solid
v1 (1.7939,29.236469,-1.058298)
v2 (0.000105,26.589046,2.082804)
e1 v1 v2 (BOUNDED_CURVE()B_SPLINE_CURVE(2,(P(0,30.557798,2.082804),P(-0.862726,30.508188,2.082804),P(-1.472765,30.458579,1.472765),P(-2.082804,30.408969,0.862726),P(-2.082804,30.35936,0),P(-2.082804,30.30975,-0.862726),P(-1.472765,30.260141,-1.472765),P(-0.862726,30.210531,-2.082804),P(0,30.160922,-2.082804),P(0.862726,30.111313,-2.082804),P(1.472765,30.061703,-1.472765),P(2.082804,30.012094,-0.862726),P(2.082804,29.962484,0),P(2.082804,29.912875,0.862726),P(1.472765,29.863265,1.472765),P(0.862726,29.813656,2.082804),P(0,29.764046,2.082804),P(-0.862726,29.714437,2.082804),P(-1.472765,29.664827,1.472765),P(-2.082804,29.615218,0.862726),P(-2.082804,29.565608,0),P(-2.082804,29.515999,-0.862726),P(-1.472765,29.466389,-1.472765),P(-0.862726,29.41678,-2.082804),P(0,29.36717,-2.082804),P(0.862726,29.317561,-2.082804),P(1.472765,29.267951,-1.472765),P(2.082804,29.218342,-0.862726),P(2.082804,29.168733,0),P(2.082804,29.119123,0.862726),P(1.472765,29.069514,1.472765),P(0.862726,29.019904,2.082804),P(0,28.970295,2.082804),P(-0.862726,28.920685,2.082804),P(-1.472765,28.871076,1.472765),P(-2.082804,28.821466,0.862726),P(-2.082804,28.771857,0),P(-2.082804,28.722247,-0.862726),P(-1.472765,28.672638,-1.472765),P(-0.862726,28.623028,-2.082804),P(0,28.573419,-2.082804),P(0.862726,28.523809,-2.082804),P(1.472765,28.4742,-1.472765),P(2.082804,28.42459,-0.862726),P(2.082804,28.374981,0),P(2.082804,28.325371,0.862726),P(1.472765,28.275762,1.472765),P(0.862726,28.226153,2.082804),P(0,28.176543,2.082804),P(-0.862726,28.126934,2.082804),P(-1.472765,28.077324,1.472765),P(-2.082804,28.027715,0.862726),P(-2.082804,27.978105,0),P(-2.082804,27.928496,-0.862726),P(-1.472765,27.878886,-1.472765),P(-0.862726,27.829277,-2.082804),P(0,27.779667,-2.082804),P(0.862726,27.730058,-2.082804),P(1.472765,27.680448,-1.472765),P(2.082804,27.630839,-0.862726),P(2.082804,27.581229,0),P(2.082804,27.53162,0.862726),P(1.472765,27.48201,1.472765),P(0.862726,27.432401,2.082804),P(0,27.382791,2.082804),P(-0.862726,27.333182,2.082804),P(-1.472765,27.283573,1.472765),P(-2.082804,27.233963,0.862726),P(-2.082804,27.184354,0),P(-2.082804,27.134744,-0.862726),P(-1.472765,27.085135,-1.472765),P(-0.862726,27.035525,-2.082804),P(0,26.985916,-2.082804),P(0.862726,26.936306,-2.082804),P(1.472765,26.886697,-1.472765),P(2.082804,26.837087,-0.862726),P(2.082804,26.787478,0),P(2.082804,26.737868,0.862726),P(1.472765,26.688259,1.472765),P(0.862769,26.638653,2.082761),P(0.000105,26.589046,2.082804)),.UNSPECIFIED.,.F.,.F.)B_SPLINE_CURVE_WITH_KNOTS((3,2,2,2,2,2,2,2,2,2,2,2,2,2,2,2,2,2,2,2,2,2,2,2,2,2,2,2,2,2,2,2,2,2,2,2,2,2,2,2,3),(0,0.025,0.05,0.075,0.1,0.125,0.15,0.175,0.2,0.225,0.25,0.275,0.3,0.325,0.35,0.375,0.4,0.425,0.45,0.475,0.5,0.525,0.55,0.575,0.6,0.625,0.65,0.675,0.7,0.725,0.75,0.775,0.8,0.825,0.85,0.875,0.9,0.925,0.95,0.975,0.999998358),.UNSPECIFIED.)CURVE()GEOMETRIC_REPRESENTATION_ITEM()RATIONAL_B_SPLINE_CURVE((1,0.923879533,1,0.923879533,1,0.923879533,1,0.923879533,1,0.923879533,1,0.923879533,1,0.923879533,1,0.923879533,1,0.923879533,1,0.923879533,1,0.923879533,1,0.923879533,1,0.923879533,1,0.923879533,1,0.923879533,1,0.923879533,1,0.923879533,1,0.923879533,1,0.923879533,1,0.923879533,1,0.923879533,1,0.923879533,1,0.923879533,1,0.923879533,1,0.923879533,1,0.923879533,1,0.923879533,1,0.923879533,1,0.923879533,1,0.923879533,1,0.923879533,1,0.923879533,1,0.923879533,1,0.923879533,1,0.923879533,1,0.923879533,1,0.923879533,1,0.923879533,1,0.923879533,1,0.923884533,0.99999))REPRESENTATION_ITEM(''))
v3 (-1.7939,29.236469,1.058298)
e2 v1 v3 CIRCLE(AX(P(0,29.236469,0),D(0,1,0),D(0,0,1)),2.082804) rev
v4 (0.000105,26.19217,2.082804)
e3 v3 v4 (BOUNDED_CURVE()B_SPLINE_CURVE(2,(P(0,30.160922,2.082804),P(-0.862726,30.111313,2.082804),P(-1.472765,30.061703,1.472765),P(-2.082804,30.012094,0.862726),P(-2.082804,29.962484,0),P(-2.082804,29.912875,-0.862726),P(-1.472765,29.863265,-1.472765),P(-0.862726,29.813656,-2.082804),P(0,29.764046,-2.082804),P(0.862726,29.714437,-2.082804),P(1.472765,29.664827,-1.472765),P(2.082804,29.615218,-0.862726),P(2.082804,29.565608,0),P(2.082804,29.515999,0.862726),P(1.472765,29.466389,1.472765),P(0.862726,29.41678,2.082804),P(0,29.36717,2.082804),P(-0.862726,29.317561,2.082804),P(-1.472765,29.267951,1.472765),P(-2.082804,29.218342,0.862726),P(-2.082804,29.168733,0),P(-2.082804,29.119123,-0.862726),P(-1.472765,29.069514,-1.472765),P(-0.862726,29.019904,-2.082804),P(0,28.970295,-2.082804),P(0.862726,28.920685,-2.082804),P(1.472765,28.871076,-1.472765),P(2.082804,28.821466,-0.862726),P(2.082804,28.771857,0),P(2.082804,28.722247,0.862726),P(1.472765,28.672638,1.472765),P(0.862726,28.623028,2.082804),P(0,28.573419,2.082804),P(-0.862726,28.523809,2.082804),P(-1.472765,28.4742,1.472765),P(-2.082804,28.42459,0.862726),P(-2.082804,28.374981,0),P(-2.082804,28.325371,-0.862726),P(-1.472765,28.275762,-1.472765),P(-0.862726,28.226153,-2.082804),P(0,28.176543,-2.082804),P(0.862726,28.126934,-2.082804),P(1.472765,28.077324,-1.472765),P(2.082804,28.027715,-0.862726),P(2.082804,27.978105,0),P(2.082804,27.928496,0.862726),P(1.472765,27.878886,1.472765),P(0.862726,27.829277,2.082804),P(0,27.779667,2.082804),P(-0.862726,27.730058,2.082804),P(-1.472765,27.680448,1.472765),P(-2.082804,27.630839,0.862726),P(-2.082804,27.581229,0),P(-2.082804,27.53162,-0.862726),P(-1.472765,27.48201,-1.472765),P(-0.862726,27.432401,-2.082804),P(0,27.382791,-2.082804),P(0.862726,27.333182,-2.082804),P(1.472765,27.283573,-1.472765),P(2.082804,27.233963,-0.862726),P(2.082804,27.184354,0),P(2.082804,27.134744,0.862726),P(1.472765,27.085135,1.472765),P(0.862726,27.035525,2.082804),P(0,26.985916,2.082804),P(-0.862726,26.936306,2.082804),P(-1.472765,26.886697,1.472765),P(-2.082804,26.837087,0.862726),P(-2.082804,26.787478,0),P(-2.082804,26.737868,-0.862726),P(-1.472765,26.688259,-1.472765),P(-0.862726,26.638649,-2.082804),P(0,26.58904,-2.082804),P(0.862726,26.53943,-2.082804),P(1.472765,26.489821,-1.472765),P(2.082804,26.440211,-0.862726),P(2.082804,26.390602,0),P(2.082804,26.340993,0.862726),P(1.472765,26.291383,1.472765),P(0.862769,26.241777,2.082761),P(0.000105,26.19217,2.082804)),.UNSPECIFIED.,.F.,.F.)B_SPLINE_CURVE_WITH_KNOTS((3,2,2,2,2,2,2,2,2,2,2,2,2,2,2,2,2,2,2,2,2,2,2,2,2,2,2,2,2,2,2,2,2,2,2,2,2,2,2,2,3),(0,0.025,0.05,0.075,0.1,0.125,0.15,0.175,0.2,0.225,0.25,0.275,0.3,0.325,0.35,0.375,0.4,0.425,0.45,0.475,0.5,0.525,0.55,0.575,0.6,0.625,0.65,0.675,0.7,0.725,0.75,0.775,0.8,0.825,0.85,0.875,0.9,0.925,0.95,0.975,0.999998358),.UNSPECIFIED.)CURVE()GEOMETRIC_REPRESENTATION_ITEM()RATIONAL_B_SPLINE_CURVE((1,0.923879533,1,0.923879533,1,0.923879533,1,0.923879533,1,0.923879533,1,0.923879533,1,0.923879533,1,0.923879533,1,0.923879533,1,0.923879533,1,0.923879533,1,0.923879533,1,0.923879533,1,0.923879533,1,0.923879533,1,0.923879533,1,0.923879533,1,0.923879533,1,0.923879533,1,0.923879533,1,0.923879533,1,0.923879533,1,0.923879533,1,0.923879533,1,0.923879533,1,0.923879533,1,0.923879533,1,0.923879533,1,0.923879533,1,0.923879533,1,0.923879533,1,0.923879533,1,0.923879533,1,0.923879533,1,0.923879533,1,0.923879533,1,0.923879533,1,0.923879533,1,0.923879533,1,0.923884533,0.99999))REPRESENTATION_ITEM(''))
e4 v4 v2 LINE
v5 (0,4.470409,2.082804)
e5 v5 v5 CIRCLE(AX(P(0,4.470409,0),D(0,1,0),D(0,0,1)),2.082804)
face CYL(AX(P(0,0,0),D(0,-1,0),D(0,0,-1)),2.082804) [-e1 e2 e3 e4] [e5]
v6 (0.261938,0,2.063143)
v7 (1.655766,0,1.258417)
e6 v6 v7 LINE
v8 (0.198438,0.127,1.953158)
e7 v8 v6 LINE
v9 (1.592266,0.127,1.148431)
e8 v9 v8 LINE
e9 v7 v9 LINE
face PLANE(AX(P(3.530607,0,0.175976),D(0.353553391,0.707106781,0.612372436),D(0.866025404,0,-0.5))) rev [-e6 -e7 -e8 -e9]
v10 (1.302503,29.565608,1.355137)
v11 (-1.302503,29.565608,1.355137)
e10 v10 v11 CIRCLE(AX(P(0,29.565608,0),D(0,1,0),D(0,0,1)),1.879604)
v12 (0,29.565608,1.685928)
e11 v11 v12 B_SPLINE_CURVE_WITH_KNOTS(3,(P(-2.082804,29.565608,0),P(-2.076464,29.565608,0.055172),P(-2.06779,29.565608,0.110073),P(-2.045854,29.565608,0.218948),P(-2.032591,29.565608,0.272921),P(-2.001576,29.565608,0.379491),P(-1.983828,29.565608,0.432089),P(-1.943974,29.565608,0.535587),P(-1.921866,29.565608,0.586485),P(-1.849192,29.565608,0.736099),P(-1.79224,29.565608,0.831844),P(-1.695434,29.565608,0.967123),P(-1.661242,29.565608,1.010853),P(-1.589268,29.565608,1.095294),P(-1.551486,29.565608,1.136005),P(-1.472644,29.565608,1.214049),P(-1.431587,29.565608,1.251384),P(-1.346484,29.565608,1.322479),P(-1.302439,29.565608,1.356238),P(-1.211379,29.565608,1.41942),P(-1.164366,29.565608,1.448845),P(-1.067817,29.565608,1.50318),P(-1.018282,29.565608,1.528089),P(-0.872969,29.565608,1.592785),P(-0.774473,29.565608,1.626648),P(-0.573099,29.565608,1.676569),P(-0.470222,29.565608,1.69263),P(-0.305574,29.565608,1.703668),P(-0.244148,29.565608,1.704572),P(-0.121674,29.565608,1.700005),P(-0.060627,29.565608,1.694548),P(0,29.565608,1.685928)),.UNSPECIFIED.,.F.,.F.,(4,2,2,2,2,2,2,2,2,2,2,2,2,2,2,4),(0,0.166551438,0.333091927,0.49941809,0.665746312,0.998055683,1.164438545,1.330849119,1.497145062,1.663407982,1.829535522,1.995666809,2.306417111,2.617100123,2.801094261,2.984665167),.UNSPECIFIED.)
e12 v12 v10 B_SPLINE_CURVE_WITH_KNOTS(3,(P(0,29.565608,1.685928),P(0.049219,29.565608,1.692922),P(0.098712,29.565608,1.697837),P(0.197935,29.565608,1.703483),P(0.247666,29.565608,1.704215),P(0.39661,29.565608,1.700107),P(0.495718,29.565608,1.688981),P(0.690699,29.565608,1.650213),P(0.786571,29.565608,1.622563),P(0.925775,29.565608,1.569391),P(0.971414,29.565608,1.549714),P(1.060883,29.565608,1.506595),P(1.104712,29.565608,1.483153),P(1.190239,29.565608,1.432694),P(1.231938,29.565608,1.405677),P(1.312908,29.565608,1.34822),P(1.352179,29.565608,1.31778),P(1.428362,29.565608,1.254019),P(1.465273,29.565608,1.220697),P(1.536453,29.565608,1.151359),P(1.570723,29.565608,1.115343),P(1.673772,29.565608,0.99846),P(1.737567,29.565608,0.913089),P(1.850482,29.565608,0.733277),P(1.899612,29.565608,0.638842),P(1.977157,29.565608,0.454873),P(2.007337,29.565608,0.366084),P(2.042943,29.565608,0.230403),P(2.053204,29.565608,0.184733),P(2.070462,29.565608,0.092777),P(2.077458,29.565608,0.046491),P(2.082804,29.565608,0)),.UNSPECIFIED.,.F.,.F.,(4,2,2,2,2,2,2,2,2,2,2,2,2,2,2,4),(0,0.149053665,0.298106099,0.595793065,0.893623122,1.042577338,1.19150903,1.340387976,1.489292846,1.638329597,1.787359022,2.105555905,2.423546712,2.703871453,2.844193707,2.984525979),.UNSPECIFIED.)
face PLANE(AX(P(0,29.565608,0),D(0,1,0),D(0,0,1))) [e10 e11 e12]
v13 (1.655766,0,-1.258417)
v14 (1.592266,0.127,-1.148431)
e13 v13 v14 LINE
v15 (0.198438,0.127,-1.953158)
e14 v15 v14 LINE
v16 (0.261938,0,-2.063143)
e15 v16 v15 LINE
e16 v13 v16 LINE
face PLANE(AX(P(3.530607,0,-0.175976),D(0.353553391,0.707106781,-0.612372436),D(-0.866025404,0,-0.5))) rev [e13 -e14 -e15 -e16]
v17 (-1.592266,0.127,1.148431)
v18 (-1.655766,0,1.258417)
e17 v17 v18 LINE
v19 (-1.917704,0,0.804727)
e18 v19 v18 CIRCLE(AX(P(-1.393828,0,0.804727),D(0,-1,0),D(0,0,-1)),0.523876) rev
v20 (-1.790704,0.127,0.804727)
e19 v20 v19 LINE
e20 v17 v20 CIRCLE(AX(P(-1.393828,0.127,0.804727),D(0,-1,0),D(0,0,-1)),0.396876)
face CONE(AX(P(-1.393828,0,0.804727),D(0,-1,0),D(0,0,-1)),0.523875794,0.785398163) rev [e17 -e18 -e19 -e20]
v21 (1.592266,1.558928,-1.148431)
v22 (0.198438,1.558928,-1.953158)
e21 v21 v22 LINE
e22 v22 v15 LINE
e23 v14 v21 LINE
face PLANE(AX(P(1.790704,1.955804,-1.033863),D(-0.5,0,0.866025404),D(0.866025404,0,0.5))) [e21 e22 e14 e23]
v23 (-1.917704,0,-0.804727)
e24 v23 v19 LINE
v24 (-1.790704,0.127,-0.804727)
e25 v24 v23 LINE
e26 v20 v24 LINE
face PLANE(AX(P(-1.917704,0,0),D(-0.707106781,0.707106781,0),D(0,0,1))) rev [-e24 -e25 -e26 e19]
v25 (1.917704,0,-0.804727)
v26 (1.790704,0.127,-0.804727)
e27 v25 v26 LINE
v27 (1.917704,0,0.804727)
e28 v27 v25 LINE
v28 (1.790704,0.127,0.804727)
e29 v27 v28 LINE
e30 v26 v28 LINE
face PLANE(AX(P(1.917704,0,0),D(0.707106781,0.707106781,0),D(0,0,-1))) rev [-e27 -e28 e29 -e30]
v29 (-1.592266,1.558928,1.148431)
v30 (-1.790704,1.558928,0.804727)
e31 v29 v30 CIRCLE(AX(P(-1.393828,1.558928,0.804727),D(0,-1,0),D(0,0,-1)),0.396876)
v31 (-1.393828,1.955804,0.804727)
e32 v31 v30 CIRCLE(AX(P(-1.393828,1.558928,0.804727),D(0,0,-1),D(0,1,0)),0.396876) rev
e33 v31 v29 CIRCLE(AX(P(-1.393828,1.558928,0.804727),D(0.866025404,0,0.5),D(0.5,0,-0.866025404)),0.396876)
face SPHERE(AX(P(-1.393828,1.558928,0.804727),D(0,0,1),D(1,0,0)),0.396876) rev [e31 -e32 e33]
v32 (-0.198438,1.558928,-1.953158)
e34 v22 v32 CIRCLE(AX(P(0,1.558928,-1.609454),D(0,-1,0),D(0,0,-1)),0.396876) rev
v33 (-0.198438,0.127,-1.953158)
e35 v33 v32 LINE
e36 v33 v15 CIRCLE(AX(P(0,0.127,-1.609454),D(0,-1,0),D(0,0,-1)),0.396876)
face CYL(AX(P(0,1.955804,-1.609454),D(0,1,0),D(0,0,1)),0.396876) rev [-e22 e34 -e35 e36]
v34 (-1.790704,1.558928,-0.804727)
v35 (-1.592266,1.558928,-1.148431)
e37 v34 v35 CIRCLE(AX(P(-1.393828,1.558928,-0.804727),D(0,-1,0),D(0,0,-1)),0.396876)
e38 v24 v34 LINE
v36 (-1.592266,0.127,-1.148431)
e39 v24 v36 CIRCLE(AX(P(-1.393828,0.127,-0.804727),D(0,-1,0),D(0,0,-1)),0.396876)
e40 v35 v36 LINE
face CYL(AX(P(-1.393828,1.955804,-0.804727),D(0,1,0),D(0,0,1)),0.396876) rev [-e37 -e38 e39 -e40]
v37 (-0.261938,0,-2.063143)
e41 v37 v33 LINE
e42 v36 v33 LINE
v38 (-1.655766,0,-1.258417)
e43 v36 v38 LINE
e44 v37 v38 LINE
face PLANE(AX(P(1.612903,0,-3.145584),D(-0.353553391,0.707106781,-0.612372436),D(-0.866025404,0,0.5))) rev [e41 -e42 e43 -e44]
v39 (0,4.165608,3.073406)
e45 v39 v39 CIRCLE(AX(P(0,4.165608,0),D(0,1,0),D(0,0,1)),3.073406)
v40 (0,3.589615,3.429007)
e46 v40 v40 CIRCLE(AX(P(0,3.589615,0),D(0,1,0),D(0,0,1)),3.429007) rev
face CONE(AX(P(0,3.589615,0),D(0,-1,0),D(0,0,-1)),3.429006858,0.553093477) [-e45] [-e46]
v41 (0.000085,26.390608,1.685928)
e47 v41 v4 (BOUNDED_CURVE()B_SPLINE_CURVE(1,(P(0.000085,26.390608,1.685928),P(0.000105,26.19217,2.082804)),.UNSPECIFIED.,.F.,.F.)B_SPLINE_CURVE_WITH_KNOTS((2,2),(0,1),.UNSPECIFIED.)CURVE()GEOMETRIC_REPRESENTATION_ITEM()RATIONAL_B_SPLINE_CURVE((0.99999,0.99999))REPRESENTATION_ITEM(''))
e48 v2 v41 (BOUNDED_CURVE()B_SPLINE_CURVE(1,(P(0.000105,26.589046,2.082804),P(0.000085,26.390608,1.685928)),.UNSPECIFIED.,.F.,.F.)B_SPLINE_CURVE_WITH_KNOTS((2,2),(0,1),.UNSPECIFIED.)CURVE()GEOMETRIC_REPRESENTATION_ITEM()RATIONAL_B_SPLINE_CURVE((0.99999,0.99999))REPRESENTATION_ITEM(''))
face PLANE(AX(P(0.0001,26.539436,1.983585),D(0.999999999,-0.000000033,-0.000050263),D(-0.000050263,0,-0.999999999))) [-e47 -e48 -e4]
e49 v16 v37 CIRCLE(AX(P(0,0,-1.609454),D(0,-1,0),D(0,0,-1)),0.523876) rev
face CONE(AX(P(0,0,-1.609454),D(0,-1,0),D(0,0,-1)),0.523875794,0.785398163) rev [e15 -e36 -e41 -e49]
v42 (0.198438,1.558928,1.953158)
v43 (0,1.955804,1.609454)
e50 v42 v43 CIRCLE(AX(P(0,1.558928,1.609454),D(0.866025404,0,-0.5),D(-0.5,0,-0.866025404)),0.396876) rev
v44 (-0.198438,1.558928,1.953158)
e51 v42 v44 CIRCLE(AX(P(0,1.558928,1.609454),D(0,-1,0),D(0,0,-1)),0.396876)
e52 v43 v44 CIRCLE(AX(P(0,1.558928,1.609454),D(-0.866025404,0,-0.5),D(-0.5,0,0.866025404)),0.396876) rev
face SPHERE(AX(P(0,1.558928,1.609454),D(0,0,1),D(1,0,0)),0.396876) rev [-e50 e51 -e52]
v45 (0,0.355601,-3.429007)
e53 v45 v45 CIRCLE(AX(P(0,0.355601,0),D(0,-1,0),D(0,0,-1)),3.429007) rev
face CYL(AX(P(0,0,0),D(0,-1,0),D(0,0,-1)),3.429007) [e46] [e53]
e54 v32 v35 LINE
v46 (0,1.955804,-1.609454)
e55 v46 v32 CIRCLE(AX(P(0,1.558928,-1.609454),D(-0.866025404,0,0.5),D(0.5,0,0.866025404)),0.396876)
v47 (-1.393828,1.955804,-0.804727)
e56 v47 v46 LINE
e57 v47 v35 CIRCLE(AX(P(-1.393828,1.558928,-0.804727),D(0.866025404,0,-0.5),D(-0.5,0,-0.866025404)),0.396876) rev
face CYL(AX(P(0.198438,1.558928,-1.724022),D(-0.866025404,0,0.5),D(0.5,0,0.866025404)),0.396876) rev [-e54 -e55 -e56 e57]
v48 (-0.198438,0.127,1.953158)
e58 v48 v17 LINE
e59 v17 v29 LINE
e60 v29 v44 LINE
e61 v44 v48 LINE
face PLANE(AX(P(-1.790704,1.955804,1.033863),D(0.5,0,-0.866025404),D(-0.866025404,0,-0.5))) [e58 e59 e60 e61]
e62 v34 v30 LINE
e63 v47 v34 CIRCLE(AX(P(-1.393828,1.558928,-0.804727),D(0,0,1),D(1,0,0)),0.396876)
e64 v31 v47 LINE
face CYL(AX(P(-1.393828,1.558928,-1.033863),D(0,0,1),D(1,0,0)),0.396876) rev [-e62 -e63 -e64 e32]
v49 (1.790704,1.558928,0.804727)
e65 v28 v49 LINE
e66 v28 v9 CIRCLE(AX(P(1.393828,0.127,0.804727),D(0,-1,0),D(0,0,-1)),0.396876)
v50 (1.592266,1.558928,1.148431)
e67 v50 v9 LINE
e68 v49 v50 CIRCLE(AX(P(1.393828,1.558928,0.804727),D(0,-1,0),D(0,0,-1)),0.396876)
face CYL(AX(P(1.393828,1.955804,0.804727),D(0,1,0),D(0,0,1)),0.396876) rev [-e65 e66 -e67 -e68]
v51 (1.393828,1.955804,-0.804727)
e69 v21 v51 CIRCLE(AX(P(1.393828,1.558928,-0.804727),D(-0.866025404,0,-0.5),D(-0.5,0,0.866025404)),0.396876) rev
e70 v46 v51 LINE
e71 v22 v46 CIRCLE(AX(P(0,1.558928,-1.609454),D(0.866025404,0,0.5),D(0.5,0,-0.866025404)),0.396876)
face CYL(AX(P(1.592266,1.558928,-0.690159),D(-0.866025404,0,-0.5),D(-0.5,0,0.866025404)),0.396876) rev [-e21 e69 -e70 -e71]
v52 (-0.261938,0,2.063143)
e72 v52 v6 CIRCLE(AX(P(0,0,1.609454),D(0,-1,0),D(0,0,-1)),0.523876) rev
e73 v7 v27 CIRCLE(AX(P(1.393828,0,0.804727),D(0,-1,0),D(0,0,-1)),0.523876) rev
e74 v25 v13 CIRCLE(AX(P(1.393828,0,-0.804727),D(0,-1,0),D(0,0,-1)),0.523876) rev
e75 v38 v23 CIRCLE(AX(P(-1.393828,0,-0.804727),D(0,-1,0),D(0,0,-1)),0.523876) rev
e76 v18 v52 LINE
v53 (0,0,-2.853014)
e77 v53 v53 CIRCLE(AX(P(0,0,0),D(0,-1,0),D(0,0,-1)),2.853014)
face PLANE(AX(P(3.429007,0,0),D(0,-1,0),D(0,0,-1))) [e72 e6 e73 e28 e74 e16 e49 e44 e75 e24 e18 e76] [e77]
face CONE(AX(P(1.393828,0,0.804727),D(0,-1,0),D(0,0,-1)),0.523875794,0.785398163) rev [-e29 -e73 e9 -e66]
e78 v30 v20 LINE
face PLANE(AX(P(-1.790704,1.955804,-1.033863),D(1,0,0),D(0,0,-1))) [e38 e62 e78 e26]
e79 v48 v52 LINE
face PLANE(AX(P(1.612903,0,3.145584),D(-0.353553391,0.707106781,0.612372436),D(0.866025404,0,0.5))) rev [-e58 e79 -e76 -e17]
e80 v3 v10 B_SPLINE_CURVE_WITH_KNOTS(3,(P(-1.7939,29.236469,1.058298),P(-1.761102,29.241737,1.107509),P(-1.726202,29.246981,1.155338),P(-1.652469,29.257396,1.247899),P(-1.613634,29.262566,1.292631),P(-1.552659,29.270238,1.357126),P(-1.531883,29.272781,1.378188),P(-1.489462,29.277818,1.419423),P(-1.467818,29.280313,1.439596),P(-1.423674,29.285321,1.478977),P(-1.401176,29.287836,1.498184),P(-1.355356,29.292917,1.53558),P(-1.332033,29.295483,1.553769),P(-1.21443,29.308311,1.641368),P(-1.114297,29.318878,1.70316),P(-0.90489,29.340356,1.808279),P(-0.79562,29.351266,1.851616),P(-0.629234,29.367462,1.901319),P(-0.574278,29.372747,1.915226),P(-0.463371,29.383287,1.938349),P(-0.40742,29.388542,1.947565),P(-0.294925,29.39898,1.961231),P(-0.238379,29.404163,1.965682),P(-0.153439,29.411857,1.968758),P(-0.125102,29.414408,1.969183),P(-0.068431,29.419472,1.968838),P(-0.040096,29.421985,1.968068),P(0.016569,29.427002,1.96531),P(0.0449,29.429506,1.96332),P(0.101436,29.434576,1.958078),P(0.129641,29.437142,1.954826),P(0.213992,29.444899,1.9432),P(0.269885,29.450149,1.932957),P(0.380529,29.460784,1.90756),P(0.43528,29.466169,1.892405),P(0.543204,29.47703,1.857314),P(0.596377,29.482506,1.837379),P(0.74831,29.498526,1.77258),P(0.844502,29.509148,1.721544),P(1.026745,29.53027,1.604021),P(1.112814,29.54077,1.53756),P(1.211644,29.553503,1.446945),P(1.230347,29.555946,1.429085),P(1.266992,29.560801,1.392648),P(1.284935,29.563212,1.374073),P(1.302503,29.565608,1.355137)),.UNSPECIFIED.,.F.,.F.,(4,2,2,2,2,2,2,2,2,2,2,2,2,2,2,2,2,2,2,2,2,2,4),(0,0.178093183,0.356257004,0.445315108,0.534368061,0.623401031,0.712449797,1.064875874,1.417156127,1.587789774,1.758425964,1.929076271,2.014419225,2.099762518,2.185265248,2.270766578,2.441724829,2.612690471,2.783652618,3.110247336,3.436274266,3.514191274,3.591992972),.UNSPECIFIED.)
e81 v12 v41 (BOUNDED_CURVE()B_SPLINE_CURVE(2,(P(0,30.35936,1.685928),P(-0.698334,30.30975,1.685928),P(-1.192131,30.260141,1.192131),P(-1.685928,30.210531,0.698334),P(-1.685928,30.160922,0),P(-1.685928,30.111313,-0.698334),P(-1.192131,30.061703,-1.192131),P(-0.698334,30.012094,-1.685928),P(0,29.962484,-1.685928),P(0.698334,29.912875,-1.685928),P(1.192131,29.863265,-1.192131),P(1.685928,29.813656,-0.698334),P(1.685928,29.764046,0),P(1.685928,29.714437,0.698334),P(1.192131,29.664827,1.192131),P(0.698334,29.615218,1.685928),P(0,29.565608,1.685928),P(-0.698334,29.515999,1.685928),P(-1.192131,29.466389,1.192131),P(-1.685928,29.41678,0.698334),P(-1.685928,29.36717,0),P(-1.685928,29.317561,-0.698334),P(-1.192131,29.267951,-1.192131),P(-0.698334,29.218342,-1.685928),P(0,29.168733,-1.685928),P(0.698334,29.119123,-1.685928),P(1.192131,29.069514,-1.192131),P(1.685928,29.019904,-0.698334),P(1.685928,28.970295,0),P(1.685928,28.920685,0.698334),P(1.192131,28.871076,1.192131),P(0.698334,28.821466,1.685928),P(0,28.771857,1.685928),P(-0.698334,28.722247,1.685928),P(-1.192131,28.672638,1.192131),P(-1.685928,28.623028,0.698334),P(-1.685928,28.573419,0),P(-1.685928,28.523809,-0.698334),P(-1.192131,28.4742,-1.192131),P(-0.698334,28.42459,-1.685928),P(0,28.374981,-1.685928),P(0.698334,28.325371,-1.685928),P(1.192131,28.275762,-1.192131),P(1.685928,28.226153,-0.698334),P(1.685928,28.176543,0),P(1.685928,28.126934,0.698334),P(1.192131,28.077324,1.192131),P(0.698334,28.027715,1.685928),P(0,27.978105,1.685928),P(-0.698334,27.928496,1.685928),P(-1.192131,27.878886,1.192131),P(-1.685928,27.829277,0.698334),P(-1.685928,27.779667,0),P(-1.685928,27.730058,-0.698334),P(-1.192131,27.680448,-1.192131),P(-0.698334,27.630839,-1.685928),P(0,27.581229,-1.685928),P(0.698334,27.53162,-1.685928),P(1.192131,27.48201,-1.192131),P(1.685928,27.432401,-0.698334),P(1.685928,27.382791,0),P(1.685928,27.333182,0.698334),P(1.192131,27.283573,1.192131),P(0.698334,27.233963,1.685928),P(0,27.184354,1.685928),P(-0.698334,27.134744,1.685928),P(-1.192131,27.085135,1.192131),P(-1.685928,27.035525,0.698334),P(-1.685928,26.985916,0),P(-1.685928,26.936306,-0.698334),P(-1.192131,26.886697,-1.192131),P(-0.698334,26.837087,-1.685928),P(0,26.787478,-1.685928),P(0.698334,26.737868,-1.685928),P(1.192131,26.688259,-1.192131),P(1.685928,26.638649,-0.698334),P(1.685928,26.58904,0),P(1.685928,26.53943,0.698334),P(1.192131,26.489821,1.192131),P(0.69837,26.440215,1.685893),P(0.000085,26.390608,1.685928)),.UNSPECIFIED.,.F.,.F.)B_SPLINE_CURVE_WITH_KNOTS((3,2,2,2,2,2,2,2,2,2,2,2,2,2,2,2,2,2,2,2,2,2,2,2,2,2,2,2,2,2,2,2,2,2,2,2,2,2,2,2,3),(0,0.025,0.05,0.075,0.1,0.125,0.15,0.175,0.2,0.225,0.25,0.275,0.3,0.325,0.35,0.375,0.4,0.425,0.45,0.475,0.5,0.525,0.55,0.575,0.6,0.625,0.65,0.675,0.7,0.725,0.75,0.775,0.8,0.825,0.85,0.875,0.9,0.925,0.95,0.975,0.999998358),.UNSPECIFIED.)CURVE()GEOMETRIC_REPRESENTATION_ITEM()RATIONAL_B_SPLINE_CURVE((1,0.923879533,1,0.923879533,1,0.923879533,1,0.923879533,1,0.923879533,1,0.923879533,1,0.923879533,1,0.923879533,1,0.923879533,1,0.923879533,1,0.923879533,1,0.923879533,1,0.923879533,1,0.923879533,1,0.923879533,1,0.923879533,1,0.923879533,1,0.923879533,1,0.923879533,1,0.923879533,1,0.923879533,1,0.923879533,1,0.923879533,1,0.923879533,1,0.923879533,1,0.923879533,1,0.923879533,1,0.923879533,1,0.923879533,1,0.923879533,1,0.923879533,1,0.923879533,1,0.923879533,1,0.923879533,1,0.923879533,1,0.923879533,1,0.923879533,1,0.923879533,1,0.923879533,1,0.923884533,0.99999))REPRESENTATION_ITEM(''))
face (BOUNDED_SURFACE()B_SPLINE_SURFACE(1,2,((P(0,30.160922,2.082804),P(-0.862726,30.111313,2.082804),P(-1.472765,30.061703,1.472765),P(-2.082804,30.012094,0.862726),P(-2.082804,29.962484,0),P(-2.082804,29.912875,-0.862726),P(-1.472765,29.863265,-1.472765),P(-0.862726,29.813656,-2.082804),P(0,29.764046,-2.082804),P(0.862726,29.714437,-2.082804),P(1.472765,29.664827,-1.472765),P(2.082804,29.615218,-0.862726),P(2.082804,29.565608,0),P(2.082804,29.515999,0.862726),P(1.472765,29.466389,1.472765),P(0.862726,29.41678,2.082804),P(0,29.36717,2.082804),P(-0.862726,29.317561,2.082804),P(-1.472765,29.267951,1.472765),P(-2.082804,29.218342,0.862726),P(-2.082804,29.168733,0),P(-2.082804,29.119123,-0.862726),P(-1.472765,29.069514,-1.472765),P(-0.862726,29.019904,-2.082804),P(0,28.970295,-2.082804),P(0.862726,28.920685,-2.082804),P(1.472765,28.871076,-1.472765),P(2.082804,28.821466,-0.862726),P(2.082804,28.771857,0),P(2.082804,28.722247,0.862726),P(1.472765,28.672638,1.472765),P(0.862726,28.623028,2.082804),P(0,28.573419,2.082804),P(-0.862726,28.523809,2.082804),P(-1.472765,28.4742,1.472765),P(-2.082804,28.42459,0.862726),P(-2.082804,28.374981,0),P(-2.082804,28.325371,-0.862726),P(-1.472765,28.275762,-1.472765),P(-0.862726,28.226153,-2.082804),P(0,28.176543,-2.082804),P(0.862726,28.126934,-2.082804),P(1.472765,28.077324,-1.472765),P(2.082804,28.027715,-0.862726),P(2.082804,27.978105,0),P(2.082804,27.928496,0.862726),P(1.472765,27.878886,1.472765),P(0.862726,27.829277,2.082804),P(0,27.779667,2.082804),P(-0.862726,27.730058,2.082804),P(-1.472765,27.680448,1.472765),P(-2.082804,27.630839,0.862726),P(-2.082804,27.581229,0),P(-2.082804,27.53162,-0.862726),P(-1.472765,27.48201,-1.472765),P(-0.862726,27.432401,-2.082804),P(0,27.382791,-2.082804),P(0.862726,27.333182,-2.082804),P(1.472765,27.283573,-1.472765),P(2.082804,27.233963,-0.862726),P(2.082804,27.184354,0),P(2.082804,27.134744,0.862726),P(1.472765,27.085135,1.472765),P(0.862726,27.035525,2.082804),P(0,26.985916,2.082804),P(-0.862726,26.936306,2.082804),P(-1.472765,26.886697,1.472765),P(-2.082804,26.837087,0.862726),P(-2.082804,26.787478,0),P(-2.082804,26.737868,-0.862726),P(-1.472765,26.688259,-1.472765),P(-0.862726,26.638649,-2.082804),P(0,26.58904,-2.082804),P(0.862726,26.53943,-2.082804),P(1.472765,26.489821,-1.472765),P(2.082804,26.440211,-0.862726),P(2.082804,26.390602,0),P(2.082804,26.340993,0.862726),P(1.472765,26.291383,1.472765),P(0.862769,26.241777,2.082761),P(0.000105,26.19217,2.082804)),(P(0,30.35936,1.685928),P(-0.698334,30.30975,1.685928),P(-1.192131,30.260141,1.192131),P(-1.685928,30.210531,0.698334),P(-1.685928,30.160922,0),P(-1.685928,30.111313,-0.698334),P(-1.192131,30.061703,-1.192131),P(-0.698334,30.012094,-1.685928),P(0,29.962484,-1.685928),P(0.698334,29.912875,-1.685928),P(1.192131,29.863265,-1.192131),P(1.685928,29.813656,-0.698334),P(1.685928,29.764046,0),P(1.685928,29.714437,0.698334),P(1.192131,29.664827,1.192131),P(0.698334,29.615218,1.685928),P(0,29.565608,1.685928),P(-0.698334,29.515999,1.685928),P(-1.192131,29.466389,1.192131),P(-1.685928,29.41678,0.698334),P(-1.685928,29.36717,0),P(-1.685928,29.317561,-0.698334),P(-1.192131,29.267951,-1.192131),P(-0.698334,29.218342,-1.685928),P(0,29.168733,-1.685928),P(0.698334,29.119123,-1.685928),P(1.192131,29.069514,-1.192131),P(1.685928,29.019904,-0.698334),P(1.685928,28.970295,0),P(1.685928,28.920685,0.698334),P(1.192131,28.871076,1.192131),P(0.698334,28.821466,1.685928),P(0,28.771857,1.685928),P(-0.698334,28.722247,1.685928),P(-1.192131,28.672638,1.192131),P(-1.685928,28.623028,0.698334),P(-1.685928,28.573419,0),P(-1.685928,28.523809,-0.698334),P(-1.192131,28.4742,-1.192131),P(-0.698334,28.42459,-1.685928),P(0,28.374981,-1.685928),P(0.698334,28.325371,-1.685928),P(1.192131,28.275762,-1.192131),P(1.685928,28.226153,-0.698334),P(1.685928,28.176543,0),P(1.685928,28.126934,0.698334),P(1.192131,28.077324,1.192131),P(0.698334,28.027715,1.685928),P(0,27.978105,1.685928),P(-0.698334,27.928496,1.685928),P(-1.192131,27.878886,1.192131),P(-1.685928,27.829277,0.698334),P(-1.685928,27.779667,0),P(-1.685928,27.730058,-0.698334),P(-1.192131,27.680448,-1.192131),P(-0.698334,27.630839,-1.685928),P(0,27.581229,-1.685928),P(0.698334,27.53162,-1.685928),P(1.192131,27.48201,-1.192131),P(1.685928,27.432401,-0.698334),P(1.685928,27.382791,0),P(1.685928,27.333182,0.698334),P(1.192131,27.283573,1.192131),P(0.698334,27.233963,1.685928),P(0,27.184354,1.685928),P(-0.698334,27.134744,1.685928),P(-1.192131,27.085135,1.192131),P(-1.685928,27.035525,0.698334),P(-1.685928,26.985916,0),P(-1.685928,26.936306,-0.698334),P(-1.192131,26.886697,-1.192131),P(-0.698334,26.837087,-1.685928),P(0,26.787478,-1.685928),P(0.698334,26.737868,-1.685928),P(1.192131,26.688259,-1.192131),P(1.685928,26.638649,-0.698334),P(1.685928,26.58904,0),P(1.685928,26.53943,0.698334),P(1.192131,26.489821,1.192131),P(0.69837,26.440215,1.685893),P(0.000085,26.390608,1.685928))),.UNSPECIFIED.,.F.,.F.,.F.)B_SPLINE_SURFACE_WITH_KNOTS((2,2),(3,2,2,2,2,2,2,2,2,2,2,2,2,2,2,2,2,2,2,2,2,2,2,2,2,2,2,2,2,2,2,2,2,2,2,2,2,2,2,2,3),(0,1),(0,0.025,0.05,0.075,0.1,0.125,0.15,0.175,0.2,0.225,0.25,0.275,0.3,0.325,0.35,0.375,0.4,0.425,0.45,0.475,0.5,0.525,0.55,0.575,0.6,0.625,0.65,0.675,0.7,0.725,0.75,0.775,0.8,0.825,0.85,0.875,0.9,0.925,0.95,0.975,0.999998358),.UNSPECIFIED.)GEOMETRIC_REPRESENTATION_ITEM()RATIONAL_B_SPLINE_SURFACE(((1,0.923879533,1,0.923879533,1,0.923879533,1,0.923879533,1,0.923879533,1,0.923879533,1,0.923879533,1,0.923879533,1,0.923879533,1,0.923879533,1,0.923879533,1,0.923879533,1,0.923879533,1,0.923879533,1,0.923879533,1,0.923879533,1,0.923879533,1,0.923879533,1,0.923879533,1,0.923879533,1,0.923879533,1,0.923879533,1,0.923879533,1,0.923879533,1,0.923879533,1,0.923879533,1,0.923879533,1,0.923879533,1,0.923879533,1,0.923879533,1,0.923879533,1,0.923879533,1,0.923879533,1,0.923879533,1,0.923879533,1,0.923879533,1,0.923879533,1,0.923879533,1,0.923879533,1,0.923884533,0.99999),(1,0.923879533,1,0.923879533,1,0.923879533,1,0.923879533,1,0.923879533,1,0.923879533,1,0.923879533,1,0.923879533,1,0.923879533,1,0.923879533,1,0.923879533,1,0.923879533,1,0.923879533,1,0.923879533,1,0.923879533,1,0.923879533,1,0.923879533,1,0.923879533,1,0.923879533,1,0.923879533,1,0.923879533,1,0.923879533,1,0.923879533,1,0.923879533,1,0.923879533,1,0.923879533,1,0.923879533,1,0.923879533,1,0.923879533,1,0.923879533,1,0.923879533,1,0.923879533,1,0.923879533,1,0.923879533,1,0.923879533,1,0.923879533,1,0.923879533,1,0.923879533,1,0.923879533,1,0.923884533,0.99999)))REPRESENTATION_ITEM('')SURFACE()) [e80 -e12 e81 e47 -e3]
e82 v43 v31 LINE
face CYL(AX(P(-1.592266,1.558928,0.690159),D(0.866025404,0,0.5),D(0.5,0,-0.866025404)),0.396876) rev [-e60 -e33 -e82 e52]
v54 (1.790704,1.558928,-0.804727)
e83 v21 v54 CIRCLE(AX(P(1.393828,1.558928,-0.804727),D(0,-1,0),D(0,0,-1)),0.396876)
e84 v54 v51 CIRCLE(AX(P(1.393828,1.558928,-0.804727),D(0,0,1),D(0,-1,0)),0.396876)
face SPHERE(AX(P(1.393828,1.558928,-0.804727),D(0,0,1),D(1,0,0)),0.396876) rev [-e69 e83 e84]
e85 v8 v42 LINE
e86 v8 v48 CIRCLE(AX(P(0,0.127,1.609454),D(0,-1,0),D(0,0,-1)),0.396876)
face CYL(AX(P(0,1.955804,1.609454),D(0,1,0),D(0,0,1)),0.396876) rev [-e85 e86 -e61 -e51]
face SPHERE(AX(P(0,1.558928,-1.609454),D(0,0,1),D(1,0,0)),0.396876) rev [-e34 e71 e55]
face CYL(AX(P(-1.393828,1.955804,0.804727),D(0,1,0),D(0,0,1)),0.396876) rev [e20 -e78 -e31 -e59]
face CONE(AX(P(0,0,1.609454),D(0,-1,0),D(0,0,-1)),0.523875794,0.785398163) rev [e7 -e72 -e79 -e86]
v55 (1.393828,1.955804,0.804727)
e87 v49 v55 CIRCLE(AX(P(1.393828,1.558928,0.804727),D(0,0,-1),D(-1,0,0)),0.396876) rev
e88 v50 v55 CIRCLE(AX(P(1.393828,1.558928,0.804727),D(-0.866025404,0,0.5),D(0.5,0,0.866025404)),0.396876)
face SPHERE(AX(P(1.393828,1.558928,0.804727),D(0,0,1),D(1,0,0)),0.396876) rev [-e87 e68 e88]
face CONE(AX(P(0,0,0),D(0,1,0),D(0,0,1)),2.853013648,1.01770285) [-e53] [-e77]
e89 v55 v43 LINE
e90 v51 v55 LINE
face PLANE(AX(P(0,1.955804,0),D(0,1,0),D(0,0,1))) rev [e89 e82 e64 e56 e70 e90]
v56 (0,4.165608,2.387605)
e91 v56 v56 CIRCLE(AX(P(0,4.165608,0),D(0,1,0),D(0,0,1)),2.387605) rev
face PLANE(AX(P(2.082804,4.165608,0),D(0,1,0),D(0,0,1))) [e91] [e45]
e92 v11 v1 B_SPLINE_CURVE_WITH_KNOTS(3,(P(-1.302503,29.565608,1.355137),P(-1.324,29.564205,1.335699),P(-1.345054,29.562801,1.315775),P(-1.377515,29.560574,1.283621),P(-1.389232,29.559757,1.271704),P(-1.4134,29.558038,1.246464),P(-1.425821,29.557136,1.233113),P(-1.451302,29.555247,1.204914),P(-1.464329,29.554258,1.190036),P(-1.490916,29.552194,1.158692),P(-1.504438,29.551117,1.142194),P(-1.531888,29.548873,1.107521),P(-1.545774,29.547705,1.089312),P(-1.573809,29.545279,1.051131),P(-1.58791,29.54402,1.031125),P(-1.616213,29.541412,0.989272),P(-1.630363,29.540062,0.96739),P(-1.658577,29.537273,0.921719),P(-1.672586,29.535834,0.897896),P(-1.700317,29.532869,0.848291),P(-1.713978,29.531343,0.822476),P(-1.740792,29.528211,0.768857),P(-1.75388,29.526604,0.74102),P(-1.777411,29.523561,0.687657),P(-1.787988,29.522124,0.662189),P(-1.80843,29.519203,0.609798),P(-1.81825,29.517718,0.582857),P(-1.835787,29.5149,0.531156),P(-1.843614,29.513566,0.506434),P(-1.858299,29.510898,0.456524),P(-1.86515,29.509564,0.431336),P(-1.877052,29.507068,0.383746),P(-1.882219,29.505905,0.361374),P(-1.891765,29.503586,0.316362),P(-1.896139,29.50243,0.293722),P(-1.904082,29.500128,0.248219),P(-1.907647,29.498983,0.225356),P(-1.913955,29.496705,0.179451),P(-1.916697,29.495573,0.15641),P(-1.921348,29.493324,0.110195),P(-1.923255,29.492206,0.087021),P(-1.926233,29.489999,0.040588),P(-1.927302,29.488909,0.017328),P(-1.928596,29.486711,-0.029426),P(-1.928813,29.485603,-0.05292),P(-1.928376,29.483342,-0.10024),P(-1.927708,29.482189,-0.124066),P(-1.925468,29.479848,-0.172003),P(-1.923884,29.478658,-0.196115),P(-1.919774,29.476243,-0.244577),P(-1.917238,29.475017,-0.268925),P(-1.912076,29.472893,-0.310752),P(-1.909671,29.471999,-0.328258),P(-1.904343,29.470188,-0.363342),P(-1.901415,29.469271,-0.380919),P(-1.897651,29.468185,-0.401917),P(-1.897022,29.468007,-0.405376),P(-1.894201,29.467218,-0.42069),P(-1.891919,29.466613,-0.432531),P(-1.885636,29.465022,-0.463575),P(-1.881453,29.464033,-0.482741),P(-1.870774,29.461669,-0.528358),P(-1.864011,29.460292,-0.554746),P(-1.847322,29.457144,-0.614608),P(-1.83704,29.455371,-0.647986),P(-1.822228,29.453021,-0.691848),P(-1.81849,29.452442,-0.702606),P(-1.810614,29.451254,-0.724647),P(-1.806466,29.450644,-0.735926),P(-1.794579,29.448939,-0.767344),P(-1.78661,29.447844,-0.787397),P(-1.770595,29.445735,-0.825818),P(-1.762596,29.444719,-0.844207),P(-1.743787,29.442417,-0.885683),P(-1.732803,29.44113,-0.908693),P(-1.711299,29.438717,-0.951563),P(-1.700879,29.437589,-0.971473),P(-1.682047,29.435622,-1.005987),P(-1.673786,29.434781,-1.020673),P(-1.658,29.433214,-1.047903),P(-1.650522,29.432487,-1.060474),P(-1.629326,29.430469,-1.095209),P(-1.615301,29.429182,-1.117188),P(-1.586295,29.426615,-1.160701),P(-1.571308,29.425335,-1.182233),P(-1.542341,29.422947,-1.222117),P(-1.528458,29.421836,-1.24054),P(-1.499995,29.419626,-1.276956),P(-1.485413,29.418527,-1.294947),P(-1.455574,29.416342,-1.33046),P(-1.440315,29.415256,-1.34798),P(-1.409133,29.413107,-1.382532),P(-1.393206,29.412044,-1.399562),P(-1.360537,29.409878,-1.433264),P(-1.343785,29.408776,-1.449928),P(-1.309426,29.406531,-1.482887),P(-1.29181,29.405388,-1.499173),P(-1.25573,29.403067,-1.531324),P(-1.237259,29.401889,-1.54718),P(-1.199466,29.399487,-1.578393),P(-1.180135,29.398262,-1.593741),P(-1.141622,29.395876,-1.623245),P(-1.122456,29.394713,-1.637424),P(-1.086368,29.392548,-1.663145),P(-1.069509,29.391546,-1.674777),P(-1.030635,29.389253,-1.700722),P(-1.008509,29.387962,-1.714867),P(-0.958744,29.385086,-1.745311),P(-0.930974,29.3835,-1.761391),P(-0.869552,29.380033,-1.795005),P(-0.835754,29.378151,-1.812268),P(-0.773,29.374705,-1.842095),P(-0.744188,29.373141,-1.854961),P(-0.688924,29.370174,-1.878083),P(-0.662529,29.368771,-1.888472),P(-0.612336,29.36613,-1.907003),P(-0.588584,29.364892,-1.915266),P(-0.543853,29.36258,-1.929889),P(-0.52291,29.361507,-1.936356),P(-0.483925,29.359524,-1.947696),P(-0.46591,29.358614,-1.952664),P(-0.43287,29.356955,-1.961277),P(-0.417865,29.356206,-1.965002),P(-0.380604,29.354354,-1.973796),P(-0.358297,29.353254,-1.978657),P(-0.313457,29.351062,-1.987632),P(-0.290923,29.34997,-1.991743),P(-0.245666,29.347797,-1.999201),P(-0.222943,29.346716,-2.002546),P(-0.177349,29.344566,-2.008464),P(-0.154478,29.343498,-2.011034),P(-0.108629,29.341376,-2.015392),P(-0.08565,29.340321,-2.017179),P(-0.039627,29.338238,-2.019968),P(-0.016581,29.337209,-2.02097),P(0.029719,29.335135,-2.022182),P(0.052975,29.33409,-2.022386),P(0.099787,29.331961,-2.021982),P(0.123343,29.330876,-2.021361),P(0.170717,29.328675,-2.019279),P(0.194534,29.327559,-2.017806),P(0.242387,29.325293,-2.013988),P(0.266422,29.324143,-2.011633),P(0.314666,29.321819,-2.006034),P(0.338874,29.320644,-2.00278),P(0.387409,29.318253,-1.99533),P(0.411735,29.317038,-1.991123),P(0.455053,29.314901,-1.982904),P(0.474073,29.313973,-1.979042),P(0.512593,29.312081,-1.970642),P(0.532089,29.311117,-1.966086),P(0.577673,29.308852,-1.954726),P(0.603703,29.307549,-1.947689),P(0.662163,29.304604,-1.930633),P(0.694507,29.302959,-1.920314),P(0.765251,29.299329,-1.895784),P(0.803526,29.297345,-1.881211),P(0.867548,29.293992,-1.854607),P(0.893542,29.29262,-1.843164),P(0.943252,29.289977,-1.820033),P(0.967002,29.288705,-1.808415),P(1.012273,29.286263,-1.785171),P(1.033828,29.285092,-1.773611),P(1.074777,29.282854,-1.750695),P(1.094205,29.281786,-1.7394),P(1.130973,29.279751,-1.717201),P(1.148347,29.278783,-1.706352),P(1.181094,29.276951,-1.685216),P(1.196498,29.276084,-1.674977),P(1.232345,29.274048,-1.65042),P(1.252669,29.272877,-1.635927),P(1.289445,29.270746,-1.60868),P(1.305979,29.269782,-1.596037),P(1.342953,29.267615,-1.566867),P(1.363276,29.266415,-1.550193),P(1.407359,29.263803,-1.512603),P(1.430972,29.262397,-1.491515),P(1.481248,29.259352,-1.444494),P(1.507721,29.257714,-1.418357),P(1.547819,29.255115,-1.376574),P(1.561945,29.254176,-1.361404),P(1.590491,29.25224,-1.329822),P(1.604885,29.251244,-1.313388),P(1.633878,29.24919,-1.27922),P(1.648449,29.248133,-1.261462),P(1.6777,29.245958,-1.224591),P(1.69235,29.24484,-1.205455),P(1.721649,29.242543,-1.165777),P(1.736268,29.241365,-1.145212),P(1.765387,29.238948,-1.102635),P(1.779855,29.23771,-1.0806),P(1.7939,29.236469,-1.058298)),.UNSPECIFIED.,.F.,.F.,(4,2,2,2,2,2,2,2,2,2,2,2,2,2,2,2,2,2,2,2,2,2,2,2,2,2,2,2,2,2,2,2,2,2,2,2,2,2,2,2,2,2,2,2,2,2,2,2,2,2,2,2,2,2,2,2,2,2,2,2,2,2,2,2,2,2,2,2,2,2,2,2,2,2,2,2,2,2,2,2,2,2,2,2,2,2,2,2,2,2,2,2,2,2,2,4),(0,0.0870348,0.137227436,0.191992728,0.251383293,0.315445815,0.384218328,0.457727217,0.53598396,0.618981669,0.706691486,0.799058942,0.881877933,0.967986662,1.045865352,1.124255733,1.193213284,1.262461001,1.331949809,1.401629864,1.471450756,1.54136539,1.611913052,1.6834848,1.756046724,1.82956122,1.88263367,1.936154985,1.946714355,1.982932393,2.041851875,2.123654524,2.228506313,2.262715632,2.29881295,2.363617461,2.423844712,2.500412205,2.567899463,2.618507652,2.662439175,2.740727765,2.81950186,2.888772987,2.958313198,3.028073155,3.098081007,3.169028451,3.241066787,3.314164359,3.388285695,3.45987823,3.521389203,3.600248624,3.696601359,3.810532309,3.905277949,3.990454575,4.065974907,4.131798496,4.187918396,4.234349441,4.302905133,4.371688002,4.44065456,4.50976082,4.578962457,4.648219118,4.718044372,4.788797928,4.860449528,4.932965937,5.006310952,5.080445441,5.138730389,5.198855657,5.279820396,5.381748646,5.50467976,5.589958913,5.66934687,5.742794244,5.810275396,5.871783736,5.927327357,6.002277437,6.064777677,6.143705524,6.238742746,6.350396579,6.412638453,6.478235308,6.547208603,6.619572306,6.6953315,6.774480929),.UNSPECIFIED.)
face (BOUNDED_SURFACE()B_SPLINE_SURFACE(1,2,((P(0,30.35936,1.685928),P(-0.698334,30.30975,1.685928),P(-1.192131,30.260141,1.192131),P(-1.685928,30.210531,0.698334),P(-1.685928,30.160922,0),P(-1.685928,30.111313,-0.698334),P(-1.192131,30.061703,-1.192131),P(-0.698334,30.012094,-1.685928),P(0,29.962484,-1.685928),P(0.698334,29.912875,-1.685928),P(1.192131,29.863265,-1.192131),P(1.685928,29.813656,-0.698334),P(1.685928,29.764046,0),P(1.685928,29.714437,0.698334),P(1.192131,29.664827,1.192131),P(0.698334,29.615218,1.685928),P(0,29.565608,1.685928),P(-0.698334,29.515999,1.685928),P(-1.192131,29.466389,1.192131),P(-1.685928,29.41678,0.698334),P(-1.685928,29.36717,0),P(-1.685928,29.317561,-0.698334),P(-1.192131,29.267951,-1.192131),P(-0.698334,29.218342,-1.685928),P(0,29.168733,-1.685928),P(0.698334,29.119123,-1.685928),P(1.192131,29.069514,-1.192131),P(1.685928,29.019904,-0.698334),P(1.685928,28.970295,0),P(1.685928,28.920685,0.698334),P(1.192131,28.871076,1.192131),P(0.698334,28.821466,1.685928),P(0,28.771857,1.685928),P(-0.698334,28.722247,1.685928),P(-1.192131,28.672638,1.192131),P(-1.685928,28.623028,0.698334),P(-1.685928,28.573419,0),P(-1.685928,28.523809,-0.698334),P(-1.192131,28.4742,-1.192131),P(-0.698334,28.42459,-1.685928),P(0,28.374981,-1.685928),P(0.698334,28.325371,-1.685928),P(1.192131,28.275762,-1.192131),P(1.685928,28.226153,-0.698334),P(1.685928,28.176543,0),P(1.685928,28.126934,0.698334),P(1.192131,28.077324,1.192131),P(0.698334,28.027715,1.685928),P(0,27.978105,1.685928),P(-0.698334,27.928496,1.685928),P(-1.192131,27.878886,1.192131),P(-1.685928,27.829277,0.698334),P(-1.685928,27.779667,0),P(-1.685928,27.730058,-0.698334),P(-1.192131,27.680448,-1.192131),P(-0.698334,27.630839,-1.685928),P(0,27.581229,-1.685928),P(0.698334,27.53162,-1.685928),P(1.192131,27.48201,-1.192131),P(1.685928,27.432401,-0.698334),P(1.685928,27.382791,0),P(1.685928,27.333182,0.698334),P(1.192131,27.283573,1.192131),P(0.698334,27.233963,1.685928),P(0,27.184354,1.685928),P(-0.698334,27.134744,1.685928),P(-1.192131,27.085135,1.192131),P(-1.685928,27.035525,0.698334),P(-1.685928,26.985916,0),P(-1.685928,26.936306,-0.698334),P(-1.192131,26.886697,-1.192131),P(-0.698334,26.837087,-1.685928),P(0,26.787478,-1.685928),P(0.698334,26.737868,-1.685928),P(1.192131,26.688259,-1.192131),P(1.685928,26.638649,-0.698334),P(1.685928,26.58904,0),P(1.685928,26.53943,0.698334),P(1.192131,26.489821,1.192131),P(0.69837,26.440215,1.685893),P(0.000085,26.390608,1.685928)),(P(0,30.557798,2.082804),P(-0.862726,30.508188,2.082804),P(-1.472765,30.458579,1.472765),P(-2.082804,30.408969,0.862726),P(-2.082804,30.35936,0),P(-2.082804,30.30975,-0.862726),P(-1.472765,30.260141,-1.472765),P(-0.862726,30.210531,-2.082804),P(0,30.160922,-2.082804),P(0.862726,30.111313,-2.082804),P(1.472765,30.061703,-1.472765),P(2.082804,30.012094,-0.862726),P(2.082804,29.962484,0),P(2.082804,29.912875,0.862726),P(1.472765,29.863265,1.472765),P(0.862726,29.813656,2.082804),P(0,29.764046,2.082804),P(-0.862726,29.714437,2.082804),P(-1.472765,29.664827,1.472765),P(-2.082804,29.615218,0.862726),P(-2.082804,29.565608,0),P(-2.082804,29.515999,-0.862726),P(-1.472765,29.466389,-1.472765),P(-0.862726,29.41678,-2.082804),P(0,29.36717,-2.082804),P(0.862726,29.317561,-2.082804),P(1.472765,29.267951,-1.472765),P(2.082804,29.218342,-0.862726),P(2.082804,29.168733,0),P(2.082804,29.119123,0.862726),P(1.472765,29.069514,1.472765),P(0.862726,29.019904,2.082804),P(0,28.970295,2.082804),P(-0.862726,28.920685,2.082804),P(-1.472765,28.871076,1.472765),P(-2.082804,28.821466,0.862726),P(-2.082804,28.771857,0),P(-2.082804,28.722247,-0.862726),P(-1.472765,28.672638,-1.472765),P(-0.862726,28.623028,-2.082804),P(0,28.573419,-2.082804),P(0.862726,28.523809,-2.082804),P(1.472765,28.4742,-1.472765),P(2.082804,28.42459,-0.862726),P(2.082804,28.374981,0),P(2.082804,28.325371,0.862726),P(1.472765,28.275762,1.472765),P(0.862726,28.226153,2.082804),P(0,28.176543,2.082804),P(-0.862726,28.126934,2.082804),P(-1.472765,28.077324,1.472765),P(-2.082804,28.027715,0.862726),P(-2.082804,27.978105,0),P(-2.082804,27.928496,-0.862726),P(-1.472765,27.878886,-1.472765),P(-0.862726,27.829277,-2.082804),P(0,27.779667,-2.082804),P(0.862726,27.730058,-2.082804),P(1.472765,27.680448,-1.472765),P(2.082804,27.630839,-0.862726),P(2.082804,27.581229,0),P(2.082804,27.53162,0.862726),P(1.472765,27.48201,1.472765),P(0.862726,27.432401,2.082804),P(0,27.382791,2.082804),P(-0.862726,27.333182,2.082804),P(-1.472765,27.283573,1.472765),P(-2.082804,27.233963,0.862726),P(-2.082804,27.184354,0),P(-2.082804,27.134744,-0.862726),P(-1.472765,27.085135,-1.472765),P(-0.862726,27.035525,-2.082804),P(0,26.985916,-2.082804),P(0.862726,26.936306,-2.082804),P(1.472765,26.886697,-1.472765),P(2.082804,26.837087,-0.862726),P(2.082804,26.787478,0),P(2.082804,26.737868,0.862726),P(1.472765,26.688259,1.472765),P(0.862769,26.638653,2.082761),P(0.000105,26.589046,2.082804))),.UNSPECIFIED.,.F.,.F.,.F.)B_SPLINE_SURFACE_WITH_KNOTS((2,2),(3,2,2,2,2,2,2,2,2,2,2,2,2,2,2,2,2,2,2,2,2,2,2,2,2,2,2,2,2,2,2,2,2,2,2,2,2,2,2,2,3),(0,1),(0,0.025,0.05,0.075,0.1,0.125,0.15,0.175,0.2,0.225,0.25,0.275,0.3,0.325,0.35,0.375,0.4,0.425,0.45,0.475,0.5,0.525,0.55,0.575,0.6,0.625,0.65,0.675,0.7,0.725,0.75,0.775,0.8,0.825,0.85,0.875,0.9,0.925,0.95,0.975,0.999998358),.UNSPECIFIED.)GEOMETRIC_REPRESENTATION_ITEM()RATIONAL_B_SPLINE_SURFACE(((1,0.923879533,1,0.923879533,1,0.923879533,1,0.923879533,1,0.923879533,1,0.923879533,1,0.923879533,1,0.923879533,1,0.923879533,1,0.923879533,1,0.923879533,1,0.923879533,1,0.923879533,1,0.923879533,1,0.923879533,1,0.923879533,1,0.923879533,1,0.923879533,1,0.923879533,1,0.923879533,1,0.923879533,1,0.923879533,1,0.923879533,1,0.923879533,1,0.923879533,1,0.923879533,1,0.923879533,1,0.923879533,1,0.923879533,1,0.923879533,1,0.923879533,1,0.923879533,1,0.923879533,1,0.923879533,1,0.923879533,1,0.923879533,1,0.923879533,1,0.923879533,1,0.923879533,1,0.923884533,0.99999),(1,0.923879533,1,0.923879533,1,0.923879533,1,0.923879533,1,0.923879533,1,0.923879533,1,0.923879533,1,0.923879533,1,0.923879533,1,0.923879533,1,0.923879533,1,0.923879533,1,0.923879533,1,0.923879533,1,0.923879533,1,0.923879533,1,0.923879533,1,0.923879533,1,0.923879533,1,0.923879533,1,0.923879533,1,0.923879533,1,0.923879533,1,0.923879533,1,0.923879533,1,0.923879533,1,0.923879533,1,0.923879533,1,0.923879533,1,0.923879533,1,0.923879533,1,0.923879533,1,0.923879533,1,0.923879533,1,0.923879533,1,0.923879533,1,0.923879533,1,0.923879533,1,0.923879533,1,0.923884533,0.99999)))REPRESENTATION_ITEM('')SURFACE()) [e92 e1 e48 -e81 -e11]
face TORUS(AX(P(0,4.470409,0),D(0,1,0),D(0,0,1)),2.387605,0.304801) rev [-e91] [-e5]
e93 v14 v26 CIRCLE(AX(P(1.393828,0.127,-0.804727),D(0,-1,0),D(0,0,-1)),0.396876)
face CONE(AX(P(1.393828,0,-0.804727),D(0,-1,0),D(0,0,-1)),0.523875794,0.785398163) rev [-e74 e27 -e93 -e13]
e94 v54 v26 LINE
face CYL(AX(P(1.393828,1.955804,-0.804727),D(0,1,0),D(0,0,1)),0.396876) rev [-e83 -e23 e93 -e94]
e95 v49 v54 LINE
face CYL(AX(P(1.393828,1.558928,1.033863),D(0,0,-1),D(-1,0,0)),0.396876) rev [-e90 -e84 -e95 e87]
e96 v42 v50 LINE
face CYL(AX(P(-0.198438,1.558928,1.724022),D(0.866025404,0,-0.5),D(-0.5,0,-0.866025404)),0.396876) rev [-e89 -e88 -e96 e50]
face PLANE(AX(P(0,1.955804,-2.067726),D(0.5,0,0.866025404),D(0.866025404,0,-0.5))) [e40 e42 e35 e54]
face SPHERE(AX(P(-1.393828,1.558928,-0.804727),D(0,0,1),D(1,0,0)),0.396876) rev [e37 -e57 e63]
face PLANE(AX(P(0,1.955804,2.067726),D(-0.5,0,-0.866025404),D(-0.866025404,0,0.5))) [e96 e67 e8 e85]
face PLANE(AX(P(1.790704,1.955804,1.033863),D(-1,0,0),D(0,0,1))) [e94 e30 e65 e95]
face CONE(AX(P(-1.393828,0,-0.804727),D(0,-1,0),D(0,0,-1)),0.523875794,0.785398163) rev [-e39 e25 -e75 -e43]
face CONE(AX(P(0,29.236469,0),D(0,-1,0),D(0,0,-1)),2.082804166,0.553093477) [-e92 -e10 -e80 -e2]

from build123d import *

# Parameters (mm, degrees)
CUT_SWEEP1_PITCH   = 0.793751588
CUT_EXTRUDE1_DEPTH = 1.955803912
FILLET1_R          = 0.30480061
FILLET2_R          = 0.396875794
CHAMFER3_SIZE      = 0.127


with BuildPart() as part:
    # Sketch1 → Revolve1 (revolve)
    with BuildSketch(Plane.XY, mode=Mode.PRIVATE) as revolve1_sk:
        Polygon((0, 0), (0, 29.565608331), (2.082804166, 29.565608331), (2.082804166, 4.165608331), (3.429006858, 4.165608331), (3.429006858, 0), align=None)
    revolve(revolve1_sk.sketch.rotate(Axis((0, 0, 0), (0, 1, 0)), 90), axis=Axis((0, 0, 0), (0, 1, 0)))

    # Cut-Sweep1: arcs per turn and ends read off the stored shape
    # Cut-Sweep1: the profile of Sketch3 profile screwed along a right-hand helix through 4.999992 turns, 8 arcs to a turn; built about Z, then put on its axis
    cut_sweep1_z = Axis((0, 0, 0), (0, 0, 1))
    cut_sweep1_corners = [(2.083104166, 0, -0.595163691), (2.083104166, 0, -0.992339484), (1.685928372, 0, -0.793751588)]
    with BuildLine(mode=Mode.PRIVATE) as cut_sweep1_profile:
        Line(cut_sweep1_corners[0], cut_sweep1_corners[1])
        Line(cut_sweep1_corners[1], cut_sweep1_corners[2])
        Line(cut_sweep1_corners[2], cut_sweep1_corners[0])
    cut_sweep1_cap = Face(cut_sweep1_profile.wire())
    cut_sweep1_turn_angles = [0, 22.5, 45, 67.5, 90, 112.5, 135, 157.5, 180, 202.5, 225, 247.5, 270, 292.5, 315, 337.5, 360]
    cut_sweep1_turn_weights = [1, 0.9238795325112867, 1, 0.9238795325112867, 1, 0.9238795325112867, 1, 0.9238795325112867, 1, 0.9238795325112867, 1, 0.9238795325112867, 1, 0.9238795325112867, 1, 0.9238795325112867, 1]
    cut_sweep1_turn_rails = [Edge.make_bspline([Vector(p[0], p[1], 0).rotate(cut_sweep1_z, cut_sweep1_turn_angles[k]) / cut_sweep1_turn_weights[k] + Vector(0, 0, p[2] + CUT_SWEEP1_PITCH * cut_sweep1_turn_angles[k] / 360) for k in range(17)], [0, 0, 0, 1, 1, 2, 2, 3, 3, 4, 4, 5, 5, 6, 6, 7, 7, 8, 8, 8], 2, cut_sweep1_turn_weights) for p in cut_sweep1_corners]
    cut_sweep1_turn_sides = [Face.make_surface_from_curves(cut_sweep1_turn_rails[p[0]], cut_sweep1_turn_rails[p[1]]) for p in [(0, 1), (1, 2), (2, 0)]]
    cut_sweep1_last_angles = [1440, 1462.5, 1485, 1507.5, 1530, 1552.5, 1575, 1597.5, 1620, 1642.5, 1665, 1687.5, 1710, 1732.5, 1755, 1777.4985, 1799.997]
    cut_sweep1_last_weights = [1, 0.9238795325112867, 1, 0.9238795325112867, 1, 0.9238795325112867, 1, 0.9238795325112867, 1, 0.9238795325112867, 1, 0.9238795325112867, 1, 0.9238795325112867, 1, 0.9238895508235082, 1]
    cut_sweep1_last_rails = [Edge.make_bspline([Vector(p[0], p[1], 0).rotate(cut_sweep1_z, cut_sweep1_last_angles[k]) / cut_sweep1_last_weights[k] + Vector(0, 0, p[2] + CUT_SWEEP1_PITCH * cut_sweep1_last_angles[k] / 360) for k in range(17)], [0, 0, 0, 1, 1, 2, 2, 3, 3, 4, 4, 5, 5, 6, 6, 7, 7, 8, 8, 8], 2, cut_sweep1_last_weights) for p in cut_sweep1_corners]
    cut_sweep1_last_sides = [Face.make_surface_from_curves(cut_sweep1_last_rails[p[0]], cut_sweep1_last_rails[p[1]]) for p in [(0, 1), (1, 2), (2, 0)]]
    cut_sweep1 = Plane(origin=(0, 29.565608331, 0), x_dir=(0, 0, 1), z_dir=(0, -1, 0)) * Solid(Shell([*[p.moved(Location((0, 0, CUT_SWEEP1_PITCH * i))) for i in range(4) for p in cut_sweep1_turn_sides], *cut_sweep1_last_sides, cut_sweep1_cap, cut_sweep1_cap.rotate(cut_sweep1_z, 1799.997).moved(Location((0, 0, CUT_SWEEP1_PITCH * 1799.997 / 360)))]))
    add(cut_sweep1, mode=Mode.SUBTRACT)

    # Sketch4 → Cut-Extrude1 (cut)
    with BuildSketch(Plane(origin=(0, 0, 0), x_dir=(1, 0, 0), z_dir=(0, 1, 0))):
        Polygon((0, 2.06772639), (-1.790703581, 1.033863195), (-1.790703581, -1.033863195), (0, -2.06772639), (1.790703581, -1.033863195), (1.790703581, 1.033863195), align=None)
    extrude(amount=CUT_EXTRUDE1_DEPTH, mode=Mode.SUBTRACT)

    # Fillet1
    fillet1_edges = [part.edges().sort_by_distance(p)[0] for p in [
        (0, 4.165608331, 2.082804166),
    ]]
    fillet(fillet1_edges, radius=FILLET1_R)

    # Fillet2
    fillet2_edges = [part.edges().sort_by_distance(p)[0] for p in [
        (1.790703581, 0.977901956, -1.033863195),
        (0, 0.977901956, -2.06772639),
        (-1.790703581, 0.977901956, -1.033863195),
        (-1.790703581, 0.977901956, 1.033863195),
        (0, 0.977901956, 2.06772639),
        (1.790703581, 0.977901956, 1.033863195),
        (0.895351791, 1.955803912, -1.550794792),
        (-0.895351791, 1.955803912, -1.550794792),
        (-1.790703581, 1.955803912, 0),
        (-0.895351791, 1.955803912, 1.550794792),
        (0.895351791, 1.955803912, 1.550794792),
        (1.790703581, 1.955803912, 0),
    ]]
    fillet(fillet2_edges, radius=FILLET2_R)

    # Chamfer1: read off the stored shape, not the designer's step
    # Chamfer1 outline → Chamfer1 (revolve, cut)
    with BuildSketch(Plane.XY):
        Polygon((2.082804166, 29.565608331), (1.879603759, 29.565608331), (2.082804166, 29.236469354), align=None)
    revolve(axis=Axis((0, 0, 0), (0, 1, 0)), mode=Mode.SUBTRACT)

    # Chamfer2: read off the stored shape, not the designer's step
    # Chamfer2 outline → Chamfer2 (revolve, cut)
    with BuildSketch(Plane.XY):
        Polygon((2.853013648, 0), (3.429006858, 0), (3.429006858, 0.355600711), align=None)
        Polygon((3.073406147, 4.165608331), (3.429006858, 3.589615121), (3.429006858, 4.165608331), align=None)
    revolve(axis=Axis((0, 0, 0), (0, 1, 0)), mode=Mode.SUBTRACT)

    # Chamfer3
    chamfer3_edges = [part.edges().sort_by_distance(p)[0] for p in [
        (0.895351791, 0, -1.550794792),
        (-0.895351791, 0, -1.550794792),
        (-1.790703581, 0, 0),
        (-0.895351791, 0, 1.550794792),
        (0.895351791, 0, 1.550794792),
        (1.790703581, 0, 0),
        (0, 0, -2.006329491),
        (1.737532307, 0, -1.003164745),
        (1.737532307, 0, 1.003164745),
        (0, 0, 2.006329491),
        (-1.737532307, 0, 1.003164745),
        (-1.737532307, 0, -1.003164745),
    ]]
    chamfer(chamfer3_edges, length=CHAMFER3_SIZE)


solid = part.part
